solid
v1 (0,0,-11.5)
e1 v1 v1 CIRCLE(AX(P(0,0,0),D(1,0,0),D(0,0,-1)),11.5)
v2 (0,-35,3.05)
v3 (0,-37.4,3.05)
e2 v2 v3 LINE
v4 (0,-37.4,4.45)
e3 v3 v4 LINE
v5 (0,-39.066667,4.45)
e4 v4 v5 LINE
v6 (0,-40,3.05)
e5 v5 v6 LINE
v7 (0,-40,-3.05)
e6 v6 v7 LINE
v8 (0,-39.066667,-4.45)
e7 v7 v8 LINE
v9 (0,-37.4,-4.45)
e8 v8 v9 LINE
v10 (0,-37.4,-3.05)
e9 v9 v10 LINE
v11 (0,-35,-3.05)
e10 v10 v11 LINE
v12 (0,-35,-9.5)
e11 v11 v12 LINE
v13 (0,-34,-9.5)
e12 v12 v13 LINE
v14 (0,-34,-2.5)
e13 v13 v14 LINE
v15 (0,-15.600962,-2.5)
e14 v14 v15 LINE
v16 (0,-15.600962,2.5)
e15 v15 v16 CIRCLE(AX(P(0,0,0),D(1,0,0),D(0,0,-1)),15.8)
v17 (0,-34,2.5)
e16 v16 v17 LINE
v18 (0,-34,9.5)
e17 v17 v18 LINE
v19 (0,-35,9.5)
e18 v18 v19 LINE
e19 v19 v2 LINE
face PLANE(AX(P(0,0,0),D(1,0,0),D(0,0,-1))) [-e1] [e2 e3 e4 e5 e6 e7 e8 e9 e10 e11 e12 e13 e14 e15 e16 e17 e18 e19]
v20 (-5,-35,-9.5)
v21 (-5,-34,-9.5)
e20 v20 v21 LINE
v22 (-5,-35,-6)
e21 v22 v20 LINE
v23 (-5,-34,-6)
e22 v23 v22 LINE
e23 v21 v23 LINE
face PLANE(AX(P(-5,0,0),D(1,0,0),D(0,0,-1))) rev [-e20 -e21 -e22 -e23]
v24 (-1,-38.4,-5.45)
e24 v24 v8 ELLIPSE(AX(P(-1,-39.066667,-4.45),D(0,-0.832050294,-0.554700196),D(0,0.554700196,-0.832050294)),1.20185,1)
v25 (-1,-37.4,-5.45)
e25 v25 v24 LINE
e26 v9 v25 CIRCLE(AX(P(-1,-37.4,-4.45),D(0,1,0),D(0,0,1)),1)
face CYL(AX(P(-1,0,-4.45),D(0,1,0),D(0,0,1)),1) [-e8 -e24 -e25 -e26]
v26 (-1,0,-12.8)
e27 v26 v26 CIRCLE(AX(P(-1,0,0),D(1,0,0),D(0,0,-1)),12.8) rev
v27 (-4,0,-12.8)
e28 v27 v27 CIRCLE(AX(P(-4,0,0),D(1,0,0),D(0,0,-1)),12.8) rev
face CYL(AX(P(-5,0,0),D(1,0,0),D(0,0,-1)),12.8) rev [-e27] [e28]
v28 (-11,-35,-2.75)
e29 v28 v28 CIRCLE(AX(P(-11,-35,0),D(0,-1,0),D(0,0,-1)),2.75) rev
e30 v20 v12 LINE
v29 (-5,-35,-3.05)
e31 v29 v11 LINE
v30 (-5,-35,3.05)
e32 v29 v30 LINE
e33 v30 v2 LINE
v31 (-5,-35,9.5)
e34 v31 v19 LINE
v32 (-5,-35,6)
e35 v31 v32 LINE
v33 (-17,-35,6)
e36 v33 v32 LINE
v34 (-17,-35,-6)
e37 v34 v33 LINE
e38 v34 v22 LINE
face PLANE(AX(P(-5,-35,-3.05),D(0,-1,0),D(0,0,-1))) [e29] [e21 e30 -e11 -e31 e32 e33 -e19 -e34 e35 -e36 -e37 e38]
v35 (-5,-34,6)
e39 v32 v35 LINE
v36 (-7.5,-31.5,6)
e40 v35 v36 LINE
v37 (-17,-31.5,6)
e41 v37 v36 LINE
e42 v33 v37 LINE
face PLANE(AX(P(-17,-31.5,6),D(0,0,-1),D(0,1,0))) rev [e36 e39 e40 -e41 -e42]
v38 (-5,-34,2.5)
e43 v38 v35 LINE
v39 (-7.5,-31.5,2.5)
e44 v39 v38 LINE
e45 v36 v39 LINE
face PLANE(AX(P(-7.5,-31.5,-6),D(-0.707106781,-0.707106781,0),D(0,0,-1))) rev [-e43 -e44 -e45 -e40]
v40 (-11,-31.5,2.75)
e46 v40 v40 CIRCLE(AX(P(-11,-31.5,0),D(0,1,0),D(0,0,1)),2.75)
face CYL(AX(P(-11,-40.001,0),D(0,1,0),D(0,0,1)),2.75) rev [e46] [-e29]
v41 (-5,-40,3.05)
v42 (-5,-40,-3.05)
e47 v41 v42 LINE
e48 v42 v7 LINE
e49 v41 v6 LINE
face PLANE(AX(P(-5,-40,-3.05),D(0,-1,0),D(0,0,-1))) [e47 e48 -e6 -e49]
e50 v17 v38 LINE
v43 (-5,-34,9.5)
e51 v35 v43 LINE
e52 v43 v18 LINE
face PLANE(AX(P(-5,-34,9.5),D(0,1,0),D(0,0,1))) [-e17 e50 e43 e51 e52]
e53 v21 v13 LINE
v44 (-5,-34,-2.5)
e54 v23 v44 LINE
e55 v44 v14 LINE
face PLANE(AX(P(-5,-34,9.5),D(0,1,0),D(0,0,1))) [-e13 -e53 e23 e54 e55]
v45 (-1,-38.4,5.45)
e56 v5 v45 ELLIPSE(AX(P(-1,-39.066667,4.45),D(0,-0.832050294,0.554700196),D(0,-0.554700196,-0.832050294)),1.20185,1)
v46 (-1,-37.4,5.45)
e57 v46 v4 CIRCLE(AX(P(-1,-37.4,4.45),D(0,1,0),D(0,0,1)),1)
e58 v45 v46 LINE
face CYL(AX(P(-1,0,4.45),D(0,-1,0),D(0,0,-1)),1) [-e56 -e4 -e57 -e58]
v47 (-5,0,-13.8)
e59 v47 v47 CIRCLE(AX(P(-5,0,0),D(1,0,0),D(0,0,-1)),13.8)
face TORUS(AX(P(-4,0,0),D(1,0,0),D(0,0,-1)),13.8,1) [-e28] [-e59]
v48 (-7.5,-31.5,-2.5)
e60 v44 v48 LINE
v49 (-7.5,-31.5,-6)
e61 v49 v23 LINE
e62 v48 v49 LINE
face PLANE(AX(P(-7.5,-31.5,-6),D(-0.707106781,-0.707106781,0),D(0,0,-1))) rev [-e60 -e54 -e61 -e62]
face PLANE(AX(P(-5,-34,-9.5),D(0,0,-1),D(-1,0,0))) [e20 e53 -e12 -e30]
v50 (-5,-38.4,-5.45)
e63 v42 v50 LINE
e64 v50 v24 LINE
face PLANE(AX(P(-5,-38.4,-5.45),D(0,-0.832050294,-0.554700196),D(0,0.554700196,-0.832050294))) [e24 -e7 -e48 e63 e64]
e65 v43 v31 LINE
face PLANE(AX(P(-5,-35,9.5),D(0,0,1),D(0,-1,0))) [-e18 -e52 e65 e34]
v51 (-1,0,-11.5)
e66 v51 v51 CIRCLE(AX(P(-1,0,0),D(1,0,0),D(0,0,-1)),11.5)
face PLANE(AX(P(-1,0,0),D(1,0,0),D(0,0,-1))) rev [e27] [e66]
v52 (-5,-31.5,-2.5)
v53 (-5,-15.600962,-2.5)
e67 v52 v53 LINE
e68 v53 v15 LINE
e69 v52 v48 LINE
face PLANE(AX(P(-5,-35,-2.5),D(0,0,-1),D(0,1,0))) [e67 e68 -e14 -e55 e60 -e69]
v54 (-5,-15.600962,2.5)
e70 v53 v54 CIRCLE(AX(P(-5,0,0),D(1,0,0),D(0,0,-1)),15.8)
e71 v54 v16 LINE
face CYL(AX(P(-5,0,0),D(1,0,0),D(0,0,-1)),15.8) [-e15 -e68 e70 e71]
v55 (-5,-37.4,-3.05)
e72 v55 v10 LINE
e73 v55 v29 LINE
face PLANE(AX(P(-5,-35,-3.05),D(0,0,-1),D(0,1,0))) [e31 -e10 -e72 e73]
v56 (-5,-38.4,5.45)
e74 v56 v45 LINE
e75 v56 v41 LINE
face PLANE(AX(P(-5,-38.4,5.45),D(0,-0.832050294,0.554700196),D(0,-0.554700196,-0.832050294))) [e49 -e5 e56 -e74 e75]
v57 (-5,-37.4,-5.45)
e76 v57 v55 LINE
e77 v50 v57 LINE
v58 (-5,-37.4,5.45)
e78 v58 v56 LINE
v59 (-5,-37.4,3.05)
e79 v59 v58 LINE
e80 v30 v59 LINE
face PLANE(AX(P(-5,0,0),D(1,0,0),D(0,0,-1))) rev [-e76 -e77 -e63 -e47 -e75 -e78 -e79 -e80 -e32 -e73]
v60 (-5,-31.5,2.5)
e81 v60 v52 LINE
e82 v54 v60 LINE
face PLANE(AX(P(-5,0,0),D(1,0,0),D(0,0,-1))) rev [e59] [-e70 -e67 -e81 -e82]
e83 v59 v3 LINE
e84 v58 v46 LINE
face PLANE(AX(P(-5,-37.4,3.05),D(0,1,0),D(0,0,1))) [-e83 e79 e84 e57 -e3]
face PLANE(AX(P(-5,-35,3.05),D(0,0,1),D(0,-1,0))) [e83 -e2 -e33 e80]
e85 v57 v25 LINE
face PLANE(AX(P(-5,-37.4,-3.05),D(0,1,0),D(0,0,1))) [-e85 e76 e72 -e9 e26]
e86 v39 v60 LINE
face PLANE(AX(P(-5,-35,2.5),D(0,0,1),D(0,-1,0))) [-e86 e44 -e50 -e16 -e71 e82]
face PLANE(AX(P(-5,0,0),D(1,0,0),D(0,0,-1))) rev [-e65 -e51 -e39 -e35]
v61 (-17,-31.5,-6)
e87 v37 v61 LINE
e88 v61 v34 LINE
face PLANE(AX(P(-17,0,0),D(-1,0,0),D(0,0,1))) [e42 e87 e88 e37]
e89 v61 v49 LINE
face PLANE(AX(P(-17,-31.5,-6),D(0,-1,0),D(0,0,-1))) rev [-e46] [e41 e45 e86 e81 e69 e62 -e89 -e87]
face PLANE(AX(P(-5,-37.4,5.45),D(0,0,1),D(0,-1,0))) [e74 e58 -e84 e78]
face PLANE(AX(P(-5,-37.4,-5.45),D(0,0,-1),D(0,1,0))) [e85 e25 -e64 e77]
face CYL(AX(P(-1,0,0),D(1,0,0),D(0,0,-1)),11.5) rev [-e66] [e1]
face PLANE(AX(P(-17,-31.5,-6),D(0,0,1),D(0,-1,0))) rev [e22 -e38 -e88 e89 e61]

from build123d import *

# Parameters (mm, degrees)
SKETCH1_R            = 15.8
SKETCH1_R_2          = 12.8
BOSS_EXTRUDE1_DEPTH  = 5
SKETCH2_W            = 5
SKETCH2_H            = 19.399038491
BOSS_EXTRUDE2_DEPTH  = 5
BOSS_EXTRUDE3_DEPTH  = 5
FILLET1_R            = 1
SKETCH38_W           = 12
SKETCH38_H           = 3.5
BOSS_EXTRUDE28_DEPTH = 12
CUT_EXTRUDE3_REACH   = 54.687
SKETCH39_R           = 2.75
CHAMFER1_SIZE        = 2.5
FILLET3_R            = 1
SKETCH1_3_R          = 12.8
SKETCH1_3_R_2        = 11.5
BOSS_EXTRUDE29_DEPTH = 1


with BuildPart() as part:
    # Sketch1 → Boss-Extrude1 (new body)
    with BuildSketch(Plane(origin=(0, 0, 0), x_dir=(0, 0, -1), z_dir=(1, 0, 0))):
        Circle(SKETCH1_R)
        Circle(SKETCH1_R_2, mode=Mode.SUBTRACT)
    extrude(amount=-BOSS_EXTRUDE1_DEPTH)

    # Sketch2 → Boss-Extrude2 (add)
    with BuildSketch(Plane(origin=(0, 0, 0), x_dir=(0, 0, -1), z_dir=(1, 0, 0))):
        with Locations((0, -25.300480755)):
            Rectangle(SKETCH2_W, SKETCH2_H)
    extrude(amount=-BOSS_EXTRUDE2_DEPTH)

    # Sketch3 → Boss-Extrude3 (add)
    with BuildSketch(Plane(origin=(0, 0, 0), x_dir=(0, 0, -1), z_dir=(1, 0, 0))):
        Polygon((-9.5, -35), (-9.5, -34), (9.5, -34), (9.5, -35), (3.05, -35), (3.05, -37.4), (5.45, -37.4), (5.45, -38.4), (3.05, -40), (-3.05, -40), (-5.45, -38.4), (-5.45, -37.4), (-3.05, -37.4), (-3.05, -35), align=None)
    extrude(amount=-BOSS_EXTRUDE3_DEPTH)

    # Fillet1
    fillet1_edges = [part.edges().sort_by_distance(p)[0] for p in [
        (0, -37.9, 5.45),
        (0, -37.9, -5.45),
    ]]
    fillet(fillet1_edges, radius=FILLET1_R)

    # Sketch38 → Boss-Extrude28 (add)
    with BuildSketch(Plane.ZY.offset(5)):
        with Locations((0, -33.25)):
            Rectangle(SKETCH38_W, SKETCH38_H)
    extrude(amount=BOSS_EXTRUDE28_DEPTH)

    # Sketch39 → Cut-Extrude3 (cut, up to next)
    with BuildSketch(Plane(origin=(0, -31.5, 0), x_dir=(1, 0, 0), z_dir=(0, 1, 0)), mode=Mode.PRIVATE) as cut_extrude3_sk1:
        with Locations(Location((-11, 0, 0), (0, 0, 270))):
            Circle(SKETCH39_R)
    cut_extrude3_tool1 = extrude(cut_extrude3_sk1.sketch, amount=-CUT_EXTRUDE3_REACH, mode=Mode.PRIVATE) & part.part
    add(cut_extrude3_tool1.solids().sort_by_distance((-11, -31.5, 0))[0], mode=Mode.SUBTRACT)

    # Chamfer1
    chamfer1_edges = [part.edges().sort_by_distance(p)[0] for p in [
        (-5, -31.5, 4.25),
        (-5, -31.5, -4.25),
    ]]
    chamfer(chamfer1_edges, length=CHAMFER1_SIZE - 0.0001)  # a hair under: the kernel refuses the full size

    # Fillet3
    fillet3_edges = [part.edges().sort_by_distance(p)[0] for p in [
        (-5, 0, 12.8),
    ]]
    fillet(fillet3_edges, radius=FILLET3_R)

    # Sketch1<3> → Boss-Extrude29 (add)
    with BuildSketch(Plane(origin=(0, 0, 0), x_dir=(0, 0, -1), z_dir=(1, 0, 0))):
        Circle(SKETCH1_3_R)
        Circle(SKETCH1_3_R_2, mode=Mode.SUBTRACT)
    extrude(amount=-BOSS_EXTRUDE29_DEPTH)


solid = part.part
